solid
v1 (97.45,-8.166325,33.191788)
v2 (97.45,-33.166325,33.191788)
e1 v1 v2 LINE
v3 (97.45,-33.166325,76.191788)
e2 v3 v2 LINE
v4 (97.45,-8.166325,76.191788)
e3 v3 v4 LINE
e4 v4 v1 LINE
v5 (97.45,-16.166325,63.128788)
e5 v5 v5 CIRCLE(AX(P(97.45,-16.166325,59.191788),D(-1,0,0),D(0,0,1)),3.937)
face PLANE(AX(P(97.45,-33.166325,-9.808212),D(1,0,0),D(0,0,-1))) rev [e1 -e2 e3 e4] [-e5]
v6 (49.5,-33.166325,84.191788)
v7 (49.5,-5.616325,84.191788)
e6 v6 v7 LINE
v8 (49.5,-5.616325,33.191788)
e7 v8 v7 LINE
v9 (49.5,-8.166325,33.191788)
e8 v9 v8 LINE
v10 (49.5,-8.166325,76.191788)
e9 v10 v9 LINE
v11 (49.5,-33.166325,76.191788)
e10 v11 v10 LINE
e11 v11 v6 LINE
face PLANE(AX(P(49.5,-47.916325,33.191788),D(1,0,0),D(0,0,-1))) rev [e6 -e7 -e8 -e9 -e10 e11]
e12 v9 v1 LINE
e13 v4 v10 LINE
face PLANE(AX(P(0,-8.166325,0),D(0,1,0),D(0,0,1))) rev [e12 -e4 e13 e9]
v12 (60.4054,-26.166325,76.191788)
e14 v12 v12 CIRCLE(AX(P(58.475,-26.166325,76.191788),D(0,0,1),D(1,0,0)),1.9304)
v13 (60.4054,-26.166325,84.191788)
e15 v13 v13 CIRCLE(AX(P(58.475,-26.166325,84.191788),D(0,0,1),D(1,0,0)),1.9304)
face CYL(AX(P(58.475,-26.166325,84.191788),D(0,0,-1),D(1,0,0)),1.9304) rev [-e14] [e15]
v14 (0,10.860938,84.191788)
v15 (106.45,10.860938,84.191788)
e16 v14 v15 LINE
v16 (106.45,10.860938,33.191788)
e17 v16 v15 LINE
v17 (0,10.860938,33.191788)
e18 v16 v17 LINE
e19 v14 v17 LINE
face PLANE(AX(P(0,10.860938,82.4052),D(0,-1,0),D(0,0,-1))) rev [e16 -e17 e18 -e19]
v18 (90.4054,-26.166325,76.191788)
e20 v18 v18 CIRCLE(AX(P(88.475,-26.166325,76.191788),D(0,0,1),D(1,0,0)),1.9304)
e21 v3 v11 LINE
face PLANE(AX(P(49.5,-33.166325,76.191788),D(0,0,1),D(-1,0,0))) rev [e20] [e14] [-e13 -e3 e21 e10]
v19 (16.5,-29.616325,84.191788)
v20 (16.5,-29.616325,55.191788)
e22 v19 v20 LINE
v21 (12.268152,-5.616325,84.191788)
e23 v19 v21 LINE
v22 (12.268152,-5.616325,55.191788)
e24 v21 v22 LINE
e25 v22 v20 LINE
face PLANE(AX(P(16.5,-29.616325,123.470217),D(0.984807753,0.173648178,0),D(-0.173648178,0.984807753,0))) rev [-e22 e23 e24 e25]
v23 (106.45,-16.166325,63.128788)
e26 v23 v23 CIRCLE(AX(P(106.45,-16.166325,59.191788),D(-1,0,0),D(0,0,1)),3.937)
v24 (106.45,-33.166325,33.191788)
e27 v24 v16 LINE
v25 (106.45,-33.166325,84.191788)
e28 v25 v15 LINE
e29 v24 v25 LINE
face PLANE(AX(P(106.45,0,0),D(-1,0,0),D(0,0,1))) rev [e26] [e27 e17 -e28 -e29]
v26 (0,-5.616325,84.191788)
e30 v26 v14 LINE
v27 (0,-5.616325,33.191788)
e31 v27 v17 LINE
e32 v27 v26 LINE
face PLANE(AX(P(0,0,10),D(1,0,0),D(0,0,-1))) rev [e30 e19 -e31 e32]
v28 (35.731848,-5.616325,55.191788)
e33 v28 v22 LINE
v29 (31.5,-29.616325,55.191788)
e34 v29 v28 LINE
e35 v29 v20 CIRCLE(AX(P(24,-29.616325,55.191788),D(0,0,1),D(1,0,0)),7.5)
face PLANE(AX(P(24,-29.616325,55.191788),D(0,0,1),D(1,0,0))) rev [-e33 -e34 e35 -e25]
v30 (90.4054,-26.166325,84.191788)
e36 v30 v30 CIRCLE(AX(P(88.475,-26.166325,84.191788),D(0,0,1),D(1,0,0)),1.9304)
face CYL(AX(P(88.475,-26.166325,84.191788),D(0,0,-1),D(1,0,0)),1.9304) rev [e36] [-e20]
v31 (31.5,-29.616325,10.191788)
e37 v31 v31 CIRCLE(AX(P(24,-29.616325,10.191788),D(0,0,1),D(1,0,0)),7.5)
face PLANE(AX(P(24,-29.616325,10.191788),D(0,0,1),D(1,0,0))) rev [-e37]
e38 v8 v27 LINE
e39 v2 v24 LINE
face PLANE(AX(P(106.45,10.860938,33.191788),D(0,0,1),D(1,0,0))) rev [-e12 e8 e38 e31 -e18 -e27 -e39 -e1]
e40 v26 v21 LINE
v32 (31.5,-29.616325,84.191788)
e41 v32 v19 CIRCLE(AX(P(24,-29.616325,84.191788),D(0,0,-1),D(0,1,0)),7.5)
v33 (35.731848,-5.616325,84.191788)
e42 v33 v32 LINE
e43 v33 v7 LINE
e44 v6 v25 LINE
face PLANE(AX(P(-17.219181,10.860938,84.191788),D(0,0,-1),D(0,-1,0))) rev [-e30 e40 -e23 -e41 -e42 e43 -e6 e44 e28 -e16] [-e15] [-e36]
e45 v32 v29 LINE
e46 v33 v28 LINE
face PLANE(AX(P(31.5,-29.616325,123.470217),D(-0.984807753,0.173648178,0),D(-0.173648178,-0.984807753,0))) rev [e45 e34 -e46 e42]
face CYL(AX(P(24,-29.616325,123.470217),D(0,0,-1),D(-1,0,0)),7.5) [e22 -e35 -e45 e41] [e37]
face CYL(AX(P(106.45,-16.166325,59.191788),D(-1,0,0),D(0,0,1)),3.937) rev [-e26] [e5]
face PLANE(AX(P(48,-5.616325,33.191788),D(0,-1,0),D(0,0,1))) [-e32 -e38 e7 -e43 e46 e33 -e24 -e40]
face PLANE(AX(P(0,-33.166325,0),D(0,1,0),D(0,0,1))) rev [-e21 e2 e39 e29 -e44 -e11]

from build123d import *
from build123d.topology import SkipClean

# Parameters (mm, degrees)
SKETCH1_W             = 48
SKETCH1_H             = 53
BOSS_EXTRUDE1_DEPTH   = 10
SKETCH2_W             = 48
SKETCH2_H             = 5.616325
BOSS_EXTRUDE2_DEPTH   = 33.1917878
SKETCH4_W             = 4
SKETCH4_H             = 10
BOSS_EXTRUDE4_DEPTH   = 40
SKETCH5_W             = 48
SKETCH5_H             = 10.8609375
BOSS_EXTRUDE5_DEPTH   = 23.1917878
SKETCH6_W             = 48
SKETCH6_H             = 5
BOSS_EXTRUDE6_DEPTH   = 42.3
SKETCH7_W             = 12.8082122
SKETCH7_H             = 16.4772625
BOSS_EXTRUDE7_DEPTH   = 48
CUT_EXTRUDE1_REACH    = 84.426
SKETCH8_R             = 11.5
SKETCH8_R_2           = 2
FILLET1_R             = 10
FILLET2_R             = 4
SKETCH9_W             = 5
SKETCH9_H             = 16.4772625
BOSS_EXTRUDE9_DEPTH   = 48
CUT_EXTRUDE2_DEPTH    = 88.252507127
SKETCH11_W            = 51
SKETCH11_H            = 16.4772625
BOSS_EXTRUDE10_DEPTH  = 49.45
BOSS_EXTRUDE11_DEPTH  = 46
SKETCH16_W            = 47.95
SKETCH16_H            = 51
BOSS_EXTRUDE14_DEPTH  = 2.55
SKETCH14_W            = 5
SKETCH14_H            = 42.3
BOSS_EXTRUDE13_DEPTH  = 1.5
SKETCH17_W            = 51
SKETCH17_H            = 19.0272625
BOSS_EXTRUDE15_DEPTH  = 9
BOSS_EXTRUDE16_DEPTH  = 25
SKETCH19_R            = 1.9304
CUT_EXTRUDE3_DEPTH    = 125.404890183
MIRROR2_START         = 33.1917878
MIRROR2_DEPTH         = 51
MIRROR2_START_2       = 76.1917878
MIRROR2_2_OUTLINE_W   = 47.95
MIRROR2_2_OUTLINE_H   = 25
MIRROR2_2_OUTLINE_R   = 1.9304
MIRROR2_2_DEPTH       = 8
MIRROR2_3_OUTLINE_W   = 45
MIRROR2_3_OUTLINE_H   = 42.3
MIRROR2_3_OUTLINE_R   = 2
MIRROR2_3_OUTLINE_R_2 = 11.5
MIRROR2_3_DEPTH       = 5
SKETCH20_W            = 103.287975037
SKETCH20_H            = 97.84889924
CUT_EXTRUDE4_DEPTH    = 144.929961559
SKETCH21_W            = 49.5
SKETCH21_H            = 42.3
CUT_EXTRUDE5_DEPTH    = 128.391431036
SKETCH24_R            = 7.5
BOSS_EXTRUDE18_DEPTH  = 45
BOSS_EXTRUDE19_DEPTH  = 29
SKETCH26_R            = 3.937
CUT_EXTRUDE6_DEPTH    = 135.023808387


# Read off the part's stored shape, not the designer's step: Mirror2
with BuildPart() as part:
    # Sketch1 → Boss-Extrude1 (new body)
    with BuildSketch(Plane.XY):
        with Locations((24, 26.5)):
            Rectangle(SKETCH1_W, SKETCH1_H)
    extrude(amount=BOSS_EXTRUDE1_DEPTH)

    # Sketch2 → Boss-Extrude2 (add)
    with BuildSketch(Plane(origin=(0, 0, 0), x_dir=(-1, 0, 0), z_dir=(0, 0, -1))):
        with Locations((-24, -2.8081625)):
            Rectangle(SKETCH2_W, SKETCH2_H)
    extrude(amount=-BOSS_EXTRUDE2_DEPTH)

    # Sketch4 → Boss-Extrude4 (add)
    with BuildSketch(Plane.XY.offset(10)):
        with Locations((2, 48)):
            Rectangle(SKETCH4_W, SKETCH4_H)
        with Locations((46, 48)):
            Rectangle(SKETCH4_W, SKETCH4_H)
    extrude(amount=BOSS_EXTRUDE4_DEPTH)

    # Sketch5 → Boss-Extrude5 (add)
    with BuildSketch(Plane.XY.offset(10)):
        with Locations((24, 5.43046875)):
            Rectangle(SKETCH5_W, SKETCH5_H)
    extrude(amount=BOSS_EXTRUDE5_DEPTH)

    # Sketch6 → Boss-Extrude6 (add)
    with BuildSketch(Plane.XZ.offset(5.616325)):
        with Locations((24, 30.6917878)):
            Rectangle(SKETCH6_W, SKETCH6_H)
    extrude(amount=BOSS_EXTRUDE6_DEPTH)

    # Sketch7 → Boss-Extrude7 (add)
    with BuildSketch(Plane.ZY):
        with Locations((-6.4041061, 2.62230625)):
            Rectangle(SKETCH7_W, SKETCH7_H)
    extrude(amount=-BOSS_EXTRUDE7_DEPTH)

    # Sketch8 → Cut-Extrude1 (cut, up to next)
    with BuildSketch(Plane(origin=(0, 0, 28.1917878), x_dir=(-1, 0, 0), z_dir=(0, 0, -1)), mode=Mode.PRIVATE) as cut_extrude1_sk1:
        with Locations((-24, -26.616325)):
            Circle(SKETCH8_R)
    cut_extrude1_tool1 = extrude(cut_extrude1_sk1.sketch, amount=-CUT_EXTRUDE1_REACH, mode=Mode.PRIVATE) & part.part
    # Sketch8 → Cut-Extrude1 (cut, up to next)
    with BuildSketch(Plane(origin=(0, 0, 28.1917878), x_dir=(-1, 0, 0), z_dir=(0, 0, -1)), mode=Mode.PRIVATE) as cut_extrude1_sk2:
        with Locations((-39.5, -11.116325)):
            Circle(SKETCH8_R_2)
    cut_extrude1_tool2 = extrude(cut_extrude1_sk2.sketch, amount=-CUT_EXTRUDE1_REACH, mode=Mode.PRIVATE) & part.part
    # Sketch8 → Cut-Extrude1 (cut, up to next)
    with BuildSketch(Plane(origin=(0, 0, 28.1917878), x_dir=(-1, 0, 0), z_dir=(0, 0, -1)), mode=Mode.PRIVATE) as cut_extrude1_sk3:
        with Locations((-39.5, -42.116325)):
            Circle(SKETCH8_R_2)
    cut_extrude1_tool3 = extrude(cut_extrude1_sk3.sketch, amount=-CUT_EXTRUDE1_REACH, mode=Mode.PRIVATE) & part.part
    # Sketch8 → Cut-Extrude1 (cut, up to next)
    with BuildSketch(Plane(origin=(0, 0, 28.1917878), x_dir=(-1, 0, 0), z_dir=(0, 0, -1)), mode=Mode.PRIVATE) as cut_extrude1_sk4:
        with Locations((-8.5, -11.116325)):
            Circle(SKETCH8_R_2)
    cut_extrude1_tool4 = extrude(cut_extrude1_sk4.sketch, amount=-CUT_EXTRUDE1_REACH, mode=Mode.PRIVATE) & part.part
    # Sketch8 → Cut-Extrude1 (cut, up to next)
    with BuildSketch(Plane(origin=(0, 0, 28.1917878), x_dir=(-1, 0, 0), z_dir=(0, 0, -1)), mode=Mode.PRIVATE) as cut_extrude1_sk5:
        with Locations((-8.5, -42.116325)):
            Circle(SKETCH8_R_2)
    cut_extrude1_tool5 = extrude(cut_extrude1_sk5.sketch, amount=-CUT_EXTRUDE1_REACH, mode=Mode.PRIVATE) & part.part
    add(cut_extrude1_tool1.solids().sort_by_distance((24, -26.616325, 28.191788))[0], mode=Mode.SUBTRACT)
    add(cut_extrude1_tool2.solids().sort_by_distance((39.5, -11.116325, 28.191788))[0], mode=Mode.SUBTRACT)
    add(cut_extrude1_tool3.solids().sort_by_distance((39.5, -42.116325, 28.191788))[0], mode=Mode.SUBTRACT)
    add(cut_extrude1_tool4.solids().sort_by_distance((8.5, -11.116325, 28.191788))[0], mode=Mode.SUBTRACT)
    add(cut_extrude1_tool5.solids().sort_by_distance((8.5, -42.116325, 28.191788))[0], mode=Mode.SUBTRACT)

    # Fillet1
    fillet1_edges = [part.edges().sort_by_distance(p)[0] for p in [
        (24, 10.8609375, 0),
    ]]
    fillet(fillet1_edges, radius=FILLET1_R)

    # Fillet2
    fillet2_edges = [part.edges().sort_by_distance(p)[0] for p in [
        (2, 43, 10),
        (46, 43, 10),
    ]]
    fillet(fillet2_edges, radius=FILLET2_R)

    # Sketch9 → Boss-Extrude9 (add)
    with BuildSketch(Plane(origin=(48, 0, 0), x_dir=(0, 0, -1), z_dir=(1, 0, 0))):
        with Locations((15.3082122, 2.62230625)):
            Rectangle(SKETCH9_W, SKETCH9_H)
    extrude(amount=-BOSS_EXTRUDE9_DEPTH)

    # Sketch10 → Cut-Extrude2 (cut, through all)
    with BuildSketch(Plane(origin=(48, 0, 0), x_dir=(0, 0, -1), z_dir=(1, 0, 0))):
        Polygon((17.8082122, 10.8609375), (-33.1917878, 10.8609375), (-76.887145623, 43.902095521), (-50.794096938, 74.436514195), (27.207463492, 71.105486703), align=None)
    extrude(amount=-CUT_EXTRUDE2_DEPTH, mode=Mode.SUBTRACT)

    # Sketch11 → Boss-Extrude10 (add)
    with BuildSketch(Plane(origin=(48, 0, 0), x_dir=(0, 0, -1), z_dir=(1, 0, 0))):
        with Locations((-7.6917878, 2.62230625)):
            Rectangle(SKETCH11_W, SKETCH11_H)
    extrude(amount=BOSS_EXTRUDE10_DEPTH)

    # Sketch12 → Boss-Extrude11 (add)
    with BuildSketch(Plane(origin=(0, 0, 28.1917878), x_dir=(-1, 0, 0), z_dir=(0, 0, -1))):
        Polygon((-48, -47.916325), (-45, -47.916325), (-45, -5.616325), (-49.5, -5.616325), (-49.5, -47.916325), align=None)
    extrude(amount=BOSS_EXTRUDE11_DEPTH)

    # Sketch16 → Boss-Extrude14 (add)
    with BuildSketch(Plane.XZ.offset(5.616325)):
        with Locations((73.475, 7.6917878)):
            Rectangle(SKETCH16_W, SKETCH16_H)
    extrude(amount=BOSS_EXTRUDE14_DEPTH)

    # Sketch14 → Boss-Extrude13 (add)
    with BuildSketch(Plane(origin=(49.5, 0, 0), x_dir=(0, 0, -1), z_dir=(1, 0, 0))):
        with Locations((-30.6917878, -26.766325)):
            Rectangle(SKETCH14_W, SKETCH14_H)
    extrude(amount=-BOSS_EXTRUDE13_DEPTH)

    # Sketch17 → Boss-Extrude15 (add)
    with BuildSketch(Plane(origin=(97.45, 0, 0), x_dir=(0, 0, -1), z_dir=(1, 0, 0))):
        with Locations((-7.6917878, 1.34730625)):
            Rectangle(SKETCH17_W, SKETCH17_H)
    extrude(amount=BOSS_EXTRUDE15_DEPTH)

    # Sketch18 → Boss-Extrude16 (add)
    with BuildSketch(Plane.XZ.offset(8.166325)):
        Polygon((49.5, -17.8082122), (106.45, -17.8082122), (106.45, -9.8082122), (106.45, 33.1917878), (97.45, 33.1917878), (97.45, -9.8082122), (49.5, -9.8082122), align=None)
    extrude(amount=BOSS_EXTRUDE16_DEPTH)

    # Sketch19 → Cut-Extrude3 (cut, through all)
    with BuildSketch(Plane.XY.offset(-9.8082122)):
        with Locations((58.475, -26.166325)):
            Circle(SKETCH19_R)
        with Locations((88.475, -26.166325)):
            Circle(SKETCH19_R)
    extrude(amount=-CUT_EXTRUDE3_DEPTH, mode=Mode.SUBTRACT)

    # Mirror2 outline → Mirror2 (add)
    with BuildSketch(Plane.XY.offset(MIRROR2_START)):
        Polygon((49.5, -47.916325), (49.5, -8.166325), (97.45, -8.166325), (97.45, -33.166325), (106.45, -33.166325), (106.45, 10.8609375), (0, 10.8609375), (0, -5.616325), (45, -5.616325), (45, -47.916325), align=None)
    extrude(amount=MIRROR2_DEPTH)

    # Mirror2 2 outline → Mirror2 2 (add)
    with BuildSketch(Plane.XY.offset(MIRROR2_START_2)):
        with Locations((73.475, -20.666325)):
            Rectangle(MIRROR2_2_OUTLINE_W, MIRROR2_2_OUTLINE_H)
        with Locations((58.475, -26.166325)):
            Circle(MIRROR2_2_OUTLINE_R, mode=Mode.SUBTRACT)
        with Locations((88.475, -26.166325)):
            Circle(MIRROR2_2_OUTLINE_R, mode=Mode.SUBTRACT)
    extrude(amount=MIRROR2_2_DEPTH)

    # Mirror2 3 outline → Mirror2 3 (add)
    with SkipClean():  # the faces are left unmerged after this step: merging them gives an invalid solid
        with BuildSketch(Plane.XY.offset(MIRROR2_START)):
            with Locations((22.5, -26.766325)):
                Rectangle(MIRROR2_3_OUTLINE_W, MIRROR2_3_OUTLINE_H)
            with Locations((8.5, -42.116325)):
                Circle(MIRROR2_3_OUTLINE_R, mode=Mode.SUBTRACT)
            with Locations((39.5, -42.116325)):
                Circle(MIRROR2_3_OUTLINE_R, mode=Mode.SUBTRACT)
            with Locations((24, -26.616325)):
                Circle(MIRROR2_3_OUTLINE_R_2, mode=Mode.SUBTRACT)
            with Locations((8.5, -11.116325)):
                Circle(MIRROR2_3_OUTLINE_R, mode=Mode.SUBTRACT)
            with Locations((39.5, -11.116325)):
                Circle(MIRROR2_3_OUTLINE_R, mode=Mode.SUBTRACT)
        extrude(amount=MIRROR2_3_DEPTH)

    # Sketch20 → Cut-Extrude4 (cut, through all)
    with BuildSketch(Plane.ZY):
        with Locations((-18.452199719, -38.06351212)):
            Rectangle(SKETCH20_W, SKETCH20_H)
    extrude(amount=-CUT_EXTRUDE4_DEPTH, mode=Mode.SUBTRACT)

    # Sketch21 → Cut-Extrude5 (cut, through all)
    with BuildSketch(Plane.XY.offset(84.1917878)):
        with Locations((24.75, -26.766325)):
            Rectangle(SKETCH21_W, SKETCH21_H)
    extrude(amount=-CUT_EXTRUDE5_DEPTH, mode=Mode.SUBTRACT)



with BuildPart() as body_2:
    # Sketch24 → Boss-Extrude18 (new body)
    with BuildSketch(Plane.XY.offset(55.1917878)):
        with Locations((24, -29.616325)):
            Circle(SKETCH24_R)
    extrude(amount=-BOSS_EXTRUDE18_DEPTH)


with BuildPart() as part_1:
    add(part.part)

    add(body_2.part)  # Boss-Extrude19 merges body 2
    # Sketch25 → Boss-Extrude19 (add)
    with BuildSketch(Plane.XY.offset(55.1917878)):
        with BuildLine():
            Line((16.5, -29.616325), (12.268152463, -5.616325))
            Line((12.268152463, -5.616325), (35.731847537, -5.616325))
            Line((35.731847537, -5.616325), (31.5, -29.616325))
            ThreePointArc((31.5, -29.616325), (24, -37.116325), (16.5, -29.616325))
        make_face()
    extrude(amount=BOSS_EXTRUDE19_DEPTH)

    # Sketch26 → Cut-Extrude6 (cut, through all)
    with BuildSketch(Plane.ZY.offset(-97.45)):
        with Locations((59.1917878, -16.166325)):
            Circle(SKETCH26_R)
    extrude(amount=-CUT_EXTRUDE6_DEPTH, mode=Mode.SUBTRACT)


solid = part_1.part
